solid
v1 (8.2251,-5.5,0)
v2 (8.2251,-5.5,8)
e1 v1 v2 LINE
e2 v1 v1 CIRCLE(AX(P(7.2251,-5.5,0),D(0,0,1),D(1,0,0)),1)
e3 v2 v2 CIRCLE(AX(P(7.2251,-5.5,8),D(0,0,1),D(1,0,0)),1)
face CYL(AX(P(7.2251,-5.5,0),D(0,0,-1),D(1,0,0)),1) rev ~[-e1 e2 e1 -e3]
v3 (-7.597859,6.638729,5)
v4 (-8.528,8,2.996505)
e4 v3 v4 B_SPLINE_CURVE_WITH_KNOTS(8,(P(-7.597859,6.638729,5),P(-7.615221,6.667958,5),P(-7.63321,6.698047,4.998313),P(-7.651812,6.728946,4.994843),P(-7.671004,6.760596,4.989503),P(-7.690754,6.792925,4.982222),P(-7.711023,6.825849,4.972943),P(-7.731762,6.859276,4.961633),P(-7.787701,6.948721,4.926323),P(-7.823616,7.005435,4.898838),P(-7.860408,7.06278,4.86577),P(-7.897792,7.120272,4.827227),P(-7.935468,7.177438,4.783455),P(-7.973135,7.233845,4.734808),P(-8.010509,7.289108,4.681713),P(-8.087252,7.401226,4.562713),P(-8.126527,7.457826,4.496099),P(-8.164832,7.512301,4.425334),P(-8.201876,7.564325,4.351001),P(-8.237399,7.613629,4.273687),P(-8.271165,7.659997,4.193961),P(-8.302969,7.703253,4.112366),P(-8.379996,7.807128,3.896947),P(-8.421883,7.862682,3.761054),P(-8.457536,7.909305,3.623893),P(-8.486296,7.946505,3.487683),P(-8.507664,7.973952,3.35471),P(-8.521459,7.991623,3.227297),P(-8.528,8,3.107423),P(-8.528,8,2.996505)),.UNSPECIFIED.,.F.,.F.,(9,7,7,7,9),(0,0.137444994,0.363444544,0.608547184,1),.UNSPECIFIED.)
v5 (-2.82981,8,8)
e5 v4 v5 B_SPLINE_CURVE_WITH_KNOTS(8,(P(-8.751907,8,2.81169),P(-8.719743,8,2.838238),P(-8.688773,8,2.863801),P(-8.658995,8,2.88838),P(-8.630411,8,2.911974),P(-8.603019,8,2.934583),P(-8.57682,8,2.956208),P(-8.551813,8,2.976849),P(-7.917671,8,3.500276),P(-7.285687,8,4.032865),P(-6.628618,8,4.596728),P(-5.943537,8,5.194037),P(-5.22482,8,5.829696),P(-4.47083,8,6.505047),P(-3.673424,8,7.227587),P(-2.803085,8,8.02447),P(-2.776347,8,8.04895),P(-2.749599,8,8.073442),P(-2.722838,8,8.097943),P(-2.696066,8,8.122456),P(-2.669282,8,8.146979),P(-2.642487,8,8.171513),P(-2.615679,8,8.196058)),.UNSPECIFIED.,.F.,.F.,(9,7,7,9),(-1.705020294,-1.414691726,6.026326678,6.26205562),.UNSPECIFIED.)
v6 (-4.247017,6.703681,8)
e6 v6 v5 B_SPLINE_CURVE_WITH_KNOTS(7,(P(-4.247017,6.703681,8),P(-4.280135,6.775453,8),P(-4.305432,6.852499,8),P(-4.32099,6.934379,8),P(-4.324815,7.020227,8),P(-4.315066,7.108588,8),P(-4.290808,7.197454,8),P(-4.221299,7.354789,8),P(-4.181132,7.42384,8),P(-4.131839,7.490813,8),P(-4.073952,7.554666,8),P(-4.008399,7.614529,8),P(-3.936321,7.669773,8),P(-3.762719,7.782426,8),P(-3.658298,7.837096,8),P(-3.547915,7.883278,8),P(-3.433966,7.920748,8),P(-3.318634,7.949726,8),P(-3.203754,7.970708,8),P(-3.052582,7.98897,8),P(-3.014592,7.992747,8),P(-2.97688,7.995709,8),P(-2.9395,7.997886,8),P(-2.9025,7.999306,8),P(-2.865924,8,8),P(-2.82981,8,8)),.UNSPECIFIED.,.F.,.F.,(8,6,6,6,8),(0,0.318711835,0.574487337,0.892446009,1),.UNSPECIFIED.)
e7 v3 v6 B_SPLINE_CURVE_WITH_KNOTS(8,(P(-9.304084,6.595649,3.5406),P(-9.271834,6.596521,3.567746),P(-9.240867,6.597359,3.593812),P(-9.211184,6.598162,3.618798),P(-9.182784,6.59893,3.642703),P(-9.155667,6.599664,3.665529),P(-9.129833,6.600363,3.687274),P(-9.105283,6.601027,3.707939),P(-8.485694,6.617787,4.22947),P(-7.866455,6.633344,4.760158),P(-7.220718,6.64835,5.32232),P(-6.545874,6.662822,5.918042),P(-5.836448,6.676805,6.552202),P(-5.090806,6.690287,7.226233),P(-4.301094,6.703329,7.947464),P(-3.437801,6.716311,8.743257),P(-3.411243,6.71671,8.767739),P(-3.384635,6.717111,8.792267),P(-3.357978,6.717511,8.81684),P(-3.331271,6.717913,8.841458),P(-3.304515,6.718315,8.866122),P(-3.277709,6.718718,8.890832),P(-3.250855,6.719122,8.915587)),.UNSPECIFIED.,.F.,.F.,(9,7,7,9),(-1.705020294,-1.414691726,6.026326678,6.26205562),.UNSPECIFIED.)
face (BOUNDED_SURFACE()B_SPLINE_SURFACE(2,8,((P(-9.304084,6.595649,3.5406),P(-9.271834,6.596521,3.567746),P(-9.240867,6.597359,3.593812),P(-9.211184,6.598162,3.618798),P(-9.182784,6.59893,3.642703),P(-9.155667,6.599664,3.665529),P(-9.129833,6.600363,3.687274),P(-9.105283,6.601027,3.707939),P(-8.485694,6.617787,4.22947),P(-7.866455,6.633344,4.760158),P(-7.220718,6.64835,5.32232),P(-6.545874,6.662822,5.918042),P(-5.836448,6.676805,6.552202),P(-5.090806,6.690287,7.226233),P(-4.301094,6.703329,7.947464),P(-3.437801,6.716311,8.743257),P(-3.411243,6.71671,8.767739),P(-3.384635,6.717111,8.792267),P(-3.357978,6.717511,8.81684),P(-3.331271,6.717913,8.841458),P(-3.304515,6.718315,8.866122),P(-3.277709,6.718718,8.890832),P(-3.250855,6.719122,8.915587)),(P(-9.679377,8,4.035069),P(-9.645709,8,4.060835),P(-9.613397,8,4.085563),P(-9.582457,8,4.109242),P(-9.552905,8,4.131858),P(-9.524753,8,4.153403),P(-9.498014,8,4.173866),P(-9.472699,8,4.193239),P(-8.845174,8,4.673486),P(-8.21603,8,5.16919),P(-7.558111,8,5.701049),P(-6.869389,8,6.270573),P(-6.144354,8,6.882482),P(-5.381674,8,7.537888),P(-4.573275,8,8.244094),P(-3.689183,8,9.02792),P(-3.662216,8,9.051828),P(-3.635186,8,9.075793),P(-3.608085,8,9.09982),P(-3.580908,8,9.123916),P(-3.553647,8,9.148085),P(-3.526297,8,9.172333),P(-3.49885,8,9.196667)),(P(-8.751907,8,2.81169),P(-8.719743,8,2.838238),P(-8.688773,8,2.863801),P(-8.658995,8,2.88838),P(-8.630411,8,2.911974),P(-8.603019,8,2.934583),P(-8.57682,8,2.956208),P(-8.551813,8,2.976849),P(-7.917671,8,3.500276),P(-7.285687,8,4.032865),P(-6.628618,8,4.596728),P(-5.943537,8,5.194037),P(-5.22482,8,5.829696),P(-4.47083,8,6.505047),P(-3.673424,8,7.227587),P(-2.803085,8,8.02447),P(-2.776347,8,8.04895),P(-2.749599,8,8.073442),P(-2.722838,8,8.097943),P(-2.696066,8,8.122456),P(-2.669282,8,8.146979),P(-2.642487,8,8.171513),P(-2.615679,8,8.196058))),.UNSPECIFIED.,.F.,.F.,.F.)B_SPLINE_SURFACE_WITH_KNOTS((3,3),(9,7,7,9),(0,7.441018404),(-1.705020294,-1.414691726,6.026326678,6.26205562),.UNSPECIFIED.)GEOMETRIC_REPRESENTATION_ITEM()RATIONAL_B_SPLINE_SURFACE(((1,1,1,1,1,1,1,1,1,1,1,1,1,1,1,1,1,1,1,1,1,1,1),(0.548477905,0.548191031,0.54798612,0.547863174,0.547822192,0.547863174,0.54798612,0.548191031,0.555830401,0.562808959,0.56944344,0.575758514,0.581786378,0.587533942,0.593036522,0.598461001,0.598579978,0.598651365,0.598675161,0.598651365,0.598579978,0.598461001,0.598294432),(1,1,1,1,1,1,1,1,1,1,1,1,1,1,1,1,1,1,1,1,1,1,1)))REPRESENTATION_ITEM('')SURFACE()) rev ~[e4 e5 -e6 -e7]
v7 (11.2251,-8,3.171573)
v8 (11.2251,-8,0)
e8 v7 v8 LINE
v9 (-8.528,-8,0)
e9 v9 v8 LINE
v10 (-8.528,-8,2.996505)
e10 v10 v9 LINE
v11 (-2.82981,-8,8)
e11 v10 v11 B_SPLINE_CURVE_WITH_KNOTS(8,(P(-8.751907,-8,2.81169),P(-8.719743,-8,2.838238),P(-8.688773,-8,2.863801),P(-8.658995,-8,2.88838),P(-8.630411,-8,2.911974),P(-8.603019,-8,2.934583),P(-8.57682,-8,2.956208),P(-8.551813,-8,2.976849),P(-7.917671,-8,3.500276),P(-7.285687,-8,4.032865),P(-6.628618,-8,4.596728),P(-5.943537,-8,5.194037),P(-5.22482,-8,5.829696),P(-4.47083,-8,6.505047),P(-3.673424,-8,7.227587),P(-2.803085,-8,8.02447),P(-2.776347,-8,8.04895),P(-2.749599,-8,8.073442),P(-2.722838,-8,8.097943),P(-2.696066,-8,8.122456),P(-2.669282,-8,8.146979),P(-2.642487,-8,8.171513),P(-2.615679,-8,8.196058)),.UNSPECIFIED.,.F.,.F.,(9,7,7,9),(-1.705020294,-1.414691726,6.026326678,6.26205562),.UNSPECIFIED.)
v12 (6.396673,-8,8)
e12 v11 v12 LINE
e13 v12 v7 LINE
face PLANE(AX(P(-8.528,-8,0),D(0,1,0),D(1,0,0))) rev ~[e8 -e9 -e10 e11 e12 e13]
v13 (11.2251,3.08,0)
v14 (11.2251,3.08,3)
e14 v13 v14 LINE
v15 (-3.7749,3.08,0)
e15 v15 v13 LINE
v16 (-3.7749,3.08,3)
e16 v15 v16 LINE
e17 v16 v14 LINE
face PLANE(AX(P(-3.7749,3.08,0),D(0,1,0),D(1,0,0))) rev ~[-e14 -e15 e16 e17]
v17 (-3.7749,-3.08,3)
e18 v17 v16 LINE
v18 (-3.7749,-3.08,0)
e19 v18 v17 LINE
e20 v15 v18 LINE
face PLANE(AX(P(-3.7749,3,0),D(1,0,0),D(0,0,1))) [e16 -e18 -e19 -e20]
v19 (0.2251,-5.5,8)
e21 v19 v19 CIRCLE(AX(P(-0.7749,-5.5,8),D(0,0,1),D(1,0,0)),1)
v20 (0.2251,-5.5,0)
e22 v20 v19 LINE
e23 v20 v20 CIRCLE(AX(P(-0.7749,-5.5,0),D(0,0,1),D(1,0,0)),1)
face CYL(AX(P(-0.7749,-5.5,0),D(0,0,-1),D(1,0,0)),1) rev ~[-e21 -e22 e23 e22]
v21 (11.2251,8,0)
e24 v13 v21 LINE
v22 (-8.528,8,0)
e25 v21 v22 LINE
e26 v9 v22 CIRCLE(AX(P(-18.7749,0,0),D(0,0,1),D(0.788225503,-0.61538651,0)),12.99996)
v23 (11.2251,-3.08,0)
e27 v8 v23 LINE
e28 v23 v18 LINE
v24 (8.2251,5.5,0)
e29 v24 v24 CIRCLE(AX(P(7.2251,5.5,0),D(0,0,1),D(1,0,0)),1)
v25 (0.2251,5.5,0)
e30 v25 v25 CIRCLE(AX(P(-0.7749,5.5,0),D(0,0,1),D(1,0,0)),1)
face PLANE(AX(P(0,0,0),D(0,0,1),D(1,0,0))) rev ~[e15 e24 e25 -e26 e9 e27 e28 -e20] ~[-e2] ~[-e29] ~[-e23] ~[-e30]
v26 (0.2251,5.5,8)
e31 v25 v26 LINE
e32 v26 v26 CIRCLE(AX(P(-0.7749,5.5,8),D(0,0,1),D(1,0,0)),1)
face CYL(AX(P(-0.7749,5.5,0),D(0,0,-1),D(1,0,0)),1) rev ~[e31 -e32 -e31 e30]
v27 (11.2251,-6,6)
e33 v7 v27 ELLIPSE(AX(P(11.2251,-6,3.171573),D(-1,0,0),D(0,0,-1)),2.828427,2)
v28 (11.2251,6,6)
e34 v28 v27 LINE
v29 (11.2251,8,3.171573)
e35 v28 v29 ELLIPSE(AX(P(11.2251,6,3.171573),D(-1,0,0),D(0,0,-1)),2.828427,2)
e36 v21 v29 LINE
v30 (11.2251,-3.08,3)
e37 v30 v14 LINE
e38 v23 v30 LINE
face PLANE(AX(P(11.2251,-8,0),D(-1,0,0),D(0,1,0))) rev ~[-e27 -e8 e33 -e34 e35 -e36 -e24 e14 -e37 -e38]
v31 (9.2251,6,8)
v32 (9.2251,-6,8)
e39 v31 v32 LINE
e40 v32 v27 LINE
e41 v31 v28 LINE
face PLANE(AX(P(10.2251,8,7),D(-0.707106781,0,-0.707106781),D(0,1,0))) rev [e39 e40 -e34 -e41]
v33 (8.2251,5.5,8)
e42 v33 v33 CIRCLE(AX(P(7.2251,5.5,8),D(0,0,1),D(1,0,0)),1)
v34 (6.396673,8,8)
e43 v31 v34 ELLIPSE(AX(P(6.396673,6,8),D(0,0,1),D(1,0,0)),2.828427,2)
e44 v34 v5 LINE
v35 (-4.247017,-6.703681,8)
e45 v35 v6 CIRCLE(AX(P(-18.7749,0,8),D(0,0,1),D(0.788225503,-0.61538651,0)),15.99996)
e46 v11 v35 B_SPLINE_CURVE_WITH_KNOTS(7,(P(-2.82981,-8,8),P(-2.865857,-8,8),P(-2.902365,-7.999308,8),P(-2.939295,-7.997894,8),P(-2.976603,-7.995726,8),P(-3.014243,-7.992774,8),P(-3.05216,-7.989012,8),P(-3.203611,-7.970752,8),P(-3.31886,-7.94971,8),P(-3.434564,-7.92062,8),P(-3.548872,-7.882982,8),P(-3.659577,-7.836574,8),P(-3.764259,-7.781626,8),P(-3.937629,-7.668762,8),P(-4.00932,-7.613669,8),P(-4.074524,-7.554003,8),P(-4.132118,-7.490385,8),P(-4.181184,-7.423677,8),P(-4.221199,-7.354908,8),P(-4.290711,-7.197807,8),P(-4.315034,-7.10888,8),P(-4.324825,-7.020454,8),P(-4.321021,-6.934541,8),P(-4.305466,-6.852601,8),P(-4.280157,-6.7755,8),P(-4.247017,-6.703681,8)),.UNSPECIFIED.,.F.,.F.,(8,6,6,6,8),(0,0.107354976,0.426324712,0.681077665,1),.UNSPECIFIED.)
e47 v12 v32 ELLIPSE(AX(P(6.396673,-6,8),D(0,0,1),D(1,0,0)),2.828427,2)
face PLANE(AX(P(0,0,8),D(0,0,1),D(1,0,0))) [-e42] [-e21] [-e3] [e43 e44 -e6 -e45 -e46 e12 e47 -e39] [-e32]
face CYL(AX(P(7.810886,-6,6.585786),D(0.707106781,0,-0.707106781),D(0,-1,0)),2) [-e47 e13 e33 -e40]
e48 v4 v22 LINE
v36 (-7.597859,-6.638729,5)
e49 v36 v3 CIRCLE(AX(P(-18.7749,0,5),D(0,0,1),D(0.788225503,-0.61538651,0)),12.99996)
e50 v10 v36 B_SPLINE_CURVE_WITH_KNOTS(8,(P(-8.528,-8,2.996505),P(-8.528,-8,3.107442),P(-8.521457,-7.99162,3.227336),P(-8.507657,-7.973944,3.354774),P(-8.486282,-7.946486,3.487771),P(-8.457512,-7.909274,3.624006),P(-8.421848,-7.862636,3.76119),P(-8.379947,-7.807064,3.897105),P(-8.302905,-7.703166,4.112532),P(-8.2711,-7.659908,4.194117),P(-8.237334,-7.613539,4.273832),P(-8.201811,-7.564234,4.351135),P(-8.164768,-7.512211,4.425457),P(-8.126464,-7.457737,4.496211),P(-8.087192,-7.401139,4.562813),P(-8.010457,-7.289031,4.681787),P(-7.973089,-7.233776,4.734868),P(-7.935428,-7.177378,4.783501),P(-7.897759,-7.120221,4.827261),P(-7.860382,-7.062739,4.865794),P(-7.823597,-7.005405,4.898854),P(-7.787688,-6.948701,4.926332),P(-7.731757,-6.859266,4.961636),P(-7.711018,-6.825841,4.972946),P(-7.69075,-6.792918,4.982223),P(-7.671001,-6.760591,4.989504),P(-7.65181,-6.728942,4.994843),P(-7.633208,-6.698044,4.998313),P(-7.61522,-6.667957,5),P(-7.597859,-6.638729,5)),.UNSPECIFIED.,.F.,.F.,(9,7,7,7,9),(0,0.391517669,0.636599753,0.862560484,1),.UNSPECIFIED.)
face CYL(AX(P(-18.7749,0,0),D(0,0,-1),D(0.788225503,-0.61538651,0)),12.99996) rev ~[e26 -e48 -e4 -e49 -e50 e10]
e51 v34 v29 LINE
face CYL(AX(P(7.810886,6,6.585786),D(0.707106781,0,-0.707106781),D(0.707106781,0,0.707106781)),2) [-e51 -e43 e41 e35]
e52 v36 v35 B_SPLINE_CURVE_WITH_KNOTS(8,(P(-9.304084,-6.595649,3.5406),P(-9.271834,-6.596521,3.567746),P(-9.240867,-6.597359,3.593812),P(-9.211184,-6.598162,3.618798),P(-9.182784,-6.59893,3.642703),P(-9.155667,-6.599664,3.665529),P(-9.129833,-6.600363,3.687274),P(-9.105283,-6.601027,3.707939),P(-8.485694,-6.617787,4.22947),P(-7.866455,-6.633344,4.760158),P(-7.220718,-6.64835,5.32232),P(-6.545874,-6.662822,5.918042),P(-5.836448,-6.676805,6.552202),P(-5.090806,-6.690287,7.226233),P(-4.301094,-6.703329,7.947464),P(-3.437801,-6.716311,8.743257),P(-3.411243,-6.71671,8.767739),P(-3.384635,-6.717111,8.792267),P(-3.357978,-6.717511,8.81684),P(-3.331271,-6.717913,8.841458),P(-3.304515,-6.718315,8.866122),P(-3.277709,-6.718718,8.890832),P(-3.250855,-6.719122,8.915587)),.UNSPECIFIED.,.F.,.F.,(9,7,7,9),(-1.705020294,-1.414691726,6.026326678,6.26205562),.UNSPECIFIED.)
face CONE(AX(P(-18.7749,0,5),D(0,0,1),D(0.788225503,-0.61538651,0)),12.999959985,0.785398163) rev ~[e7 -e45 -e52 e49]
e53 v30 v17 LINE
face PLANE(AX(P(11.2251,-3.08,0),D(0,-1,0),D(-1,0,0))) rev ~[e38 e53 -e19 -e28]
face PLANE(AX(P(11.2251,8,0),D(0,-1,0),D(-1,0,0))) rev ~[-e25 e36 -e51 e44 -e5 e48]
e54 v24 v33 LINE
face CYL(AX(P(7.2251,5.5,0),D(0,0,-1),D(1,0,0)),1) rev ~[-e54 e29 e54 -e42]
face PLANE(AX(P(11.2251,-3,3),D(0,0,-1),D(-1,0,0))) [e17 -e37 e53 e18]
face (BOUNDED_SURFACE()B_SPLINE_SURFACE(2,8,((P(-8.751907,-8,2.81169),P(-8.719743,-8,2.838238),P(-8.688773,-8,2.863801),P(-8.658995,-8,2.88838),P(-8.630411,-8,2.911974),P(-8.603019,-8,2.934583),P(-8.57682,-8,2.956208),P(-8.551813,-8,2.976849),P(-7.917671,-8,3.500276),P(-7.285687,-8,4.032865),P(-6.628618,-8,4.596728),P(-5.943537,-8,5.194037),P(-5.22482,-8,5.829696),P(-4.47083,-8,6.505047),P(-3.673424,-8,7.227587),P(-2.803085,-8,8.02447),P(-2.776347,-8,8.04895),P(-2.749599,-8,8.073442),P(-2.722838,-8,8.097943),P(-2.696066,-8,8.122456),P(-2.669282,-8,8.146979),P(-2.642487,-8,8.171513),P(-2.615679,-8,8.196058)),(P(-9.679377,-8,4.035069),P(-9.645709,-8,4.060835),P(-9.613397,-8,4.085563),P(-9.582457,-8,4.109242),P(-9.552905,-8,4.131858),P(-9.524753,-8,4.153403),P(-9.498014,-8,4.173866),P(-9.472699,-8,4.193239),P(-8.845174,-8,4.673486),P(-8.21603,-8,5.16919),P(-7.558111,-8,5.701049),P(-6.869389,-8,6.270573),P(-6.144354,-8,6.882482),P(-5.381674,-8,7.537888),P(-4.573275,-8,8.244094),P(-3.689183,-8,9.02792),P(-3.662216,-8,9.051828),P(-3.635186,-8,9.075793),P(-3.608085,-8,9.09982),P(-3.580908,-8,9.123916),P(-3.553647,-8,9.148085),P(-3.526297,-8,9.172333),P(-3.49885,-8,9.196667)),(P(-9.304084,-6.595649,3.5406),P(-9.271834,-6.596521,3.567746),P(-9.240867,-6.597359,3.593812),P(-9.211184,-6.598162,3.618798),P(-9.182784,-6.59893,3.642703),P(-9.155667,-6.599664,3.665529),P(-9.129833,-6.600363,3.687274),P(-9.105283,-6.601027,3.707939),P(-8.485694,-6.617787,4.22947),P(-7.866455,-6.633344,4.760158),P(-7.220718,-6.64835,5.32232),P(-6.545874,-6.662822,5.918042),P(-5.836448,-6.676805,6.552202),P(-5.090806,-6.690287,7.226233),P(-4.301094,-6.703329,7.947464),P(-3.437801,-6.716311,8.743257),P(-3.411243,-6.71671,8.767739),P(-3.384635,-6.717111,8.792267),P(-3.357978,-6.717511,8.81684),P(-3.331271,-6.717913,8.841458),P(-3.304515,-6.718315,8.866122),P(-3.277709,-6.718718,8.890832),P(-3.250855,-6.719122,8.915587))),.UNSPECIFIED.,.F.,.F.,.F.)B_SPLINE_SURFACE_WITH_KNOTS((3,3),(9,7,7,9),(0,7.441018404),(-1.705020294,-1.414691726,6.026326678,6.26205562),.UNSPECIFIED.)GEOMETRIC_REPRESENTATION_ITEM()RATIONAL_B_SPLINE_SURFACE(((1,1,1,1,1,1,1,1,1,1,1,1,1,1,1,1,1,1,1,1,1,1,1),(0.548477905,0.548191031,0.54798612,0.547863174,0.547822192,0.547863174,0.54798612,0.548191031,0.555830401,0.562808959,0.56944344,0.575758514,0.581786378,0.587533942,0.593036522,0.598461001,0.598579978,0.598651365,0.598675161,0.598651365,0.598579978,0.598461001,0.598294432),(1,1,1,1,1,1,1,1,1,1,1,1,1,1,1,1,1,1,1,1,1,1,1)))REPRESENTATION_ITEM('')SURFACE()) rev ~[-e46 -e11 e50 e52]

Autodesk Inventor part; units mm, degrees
ref_plane "YZ Plane" through (0, 0, 0) normal (1, 0, 0) x (0, 1, 0)
ref_plane "XZ Plane" through (0, 0, 0) normal (0, 1, 0) x (-1, 0, 0)
ref_plane "XY Plane" through (0, 0, 0) normal (0, 0, 1) x (1, 0, 0)
sketch "Sketch1" plane through (0, 0, 0) normal (0, 0, 1) x (1, 0, 0)
  circle A0 centre (-0.7749, 5.5) radius 1 projected
  circle A1 centre (7.2251, 5.5) radius 1 projected
  circle A2 centre (-0.7749, -5.5) radius 1 projected
  circle A3 centre (7.2251, -5.5) radius 1 projected
  line L0 (11.2251, -3) -> (-3.7749, -3) projected
  line L1 (-3.7749, -3) -> (-3.7749, 3) projected
  line L2 (-3.7749, 3) -> (11.2251, 3) projected
  line L3 (11.2251, 3) -> (11.2251, 8) projected
  line L4 (11.2251, 8) -> (-8.528, 8) projected
  arc A4 (-8.528, -8) -> (-8.528, 8) centre (-18.7749, 0) ccw projected
  line L5 (-8.528, -8) -> (11.2251, -8) projected
  line L6 (11.2251, -8) -> (11.2251, -3) projected
  point P0 (0, 0)
extrude "Extrusion1" add sketch "Sketch1" along normal blind 3
sketch "Sketch2" plane through (0, 0, 3) normal (0, 0, 1) x (1, 0, 0)
  line L0 (11.2251, -8) -> (11.2251, -3) projected
  line L1 (11.2251, -3) -> (-3.7749, -3) projected
  line L2 (-3.7749, -3) -> (-3.7749, 3) projected
  line L3 (-3.7749, 3) -> (11.2251, 3) projected
  line L4 (11.2251, 3) -> (11.2251, 8) projected
  line L5 (11.2251, 8) -> (-8.528, 8) projected
  arc A0 (-8.528, -8) -> (-8.528, 8) centre (-18.7749, 0) ccw projected
  line L6 (-8.528, -8) -> (11.2251, -8) projected
  circle A1 centre (-0.7749, 5.5) radius 1 projected
  circle A2 centre (7.2251, 5.5) radius 1 projected
  circle A3 centre (-0.7749, -5.5) radius 1 projected
  circle A4 centre (7.2251, -5.5) radius 1 projected
  line L7 (11.2251, -8) -> (11.2251, -3) projected
  line L8 (11.2251, 3) -> (11.2251, 8) projected
  line L9 (11.2251, -8) -> (11.2251, 8)
  point P0 (0, 0)
extrude "Extrusion2" add sketch "Sketch2" along normal blind 5
chamfer "Chamfer1" distance 3 angle 45 1 edges at (-5.7749, 0, 8)
fillet "Fillet1" radius 1 2 edges at (-6.817, -8, 6.3872) (-6.817, 8, 6.3872)
chamfer "Chamfer2" distance 2 angle 45 1 edges at (11.2251, 0, 8)
fillet "Fillet2" radius 2 2 edges at (10.2251, -8, 7) (10.2251, 8, 7)
thicken "Thicken1" operation add thickness 0.08 both sides no extend neighbours yes toward (0, 1, 0) faces at (1.2251, 3, 1)
thicken "Thicken2" operation add thickness 0.08 both sides no extend neighbours yes toward (0, -1, 0) faces at (6.2251, -3, 1)
properties part number "armtip_2_mod"
